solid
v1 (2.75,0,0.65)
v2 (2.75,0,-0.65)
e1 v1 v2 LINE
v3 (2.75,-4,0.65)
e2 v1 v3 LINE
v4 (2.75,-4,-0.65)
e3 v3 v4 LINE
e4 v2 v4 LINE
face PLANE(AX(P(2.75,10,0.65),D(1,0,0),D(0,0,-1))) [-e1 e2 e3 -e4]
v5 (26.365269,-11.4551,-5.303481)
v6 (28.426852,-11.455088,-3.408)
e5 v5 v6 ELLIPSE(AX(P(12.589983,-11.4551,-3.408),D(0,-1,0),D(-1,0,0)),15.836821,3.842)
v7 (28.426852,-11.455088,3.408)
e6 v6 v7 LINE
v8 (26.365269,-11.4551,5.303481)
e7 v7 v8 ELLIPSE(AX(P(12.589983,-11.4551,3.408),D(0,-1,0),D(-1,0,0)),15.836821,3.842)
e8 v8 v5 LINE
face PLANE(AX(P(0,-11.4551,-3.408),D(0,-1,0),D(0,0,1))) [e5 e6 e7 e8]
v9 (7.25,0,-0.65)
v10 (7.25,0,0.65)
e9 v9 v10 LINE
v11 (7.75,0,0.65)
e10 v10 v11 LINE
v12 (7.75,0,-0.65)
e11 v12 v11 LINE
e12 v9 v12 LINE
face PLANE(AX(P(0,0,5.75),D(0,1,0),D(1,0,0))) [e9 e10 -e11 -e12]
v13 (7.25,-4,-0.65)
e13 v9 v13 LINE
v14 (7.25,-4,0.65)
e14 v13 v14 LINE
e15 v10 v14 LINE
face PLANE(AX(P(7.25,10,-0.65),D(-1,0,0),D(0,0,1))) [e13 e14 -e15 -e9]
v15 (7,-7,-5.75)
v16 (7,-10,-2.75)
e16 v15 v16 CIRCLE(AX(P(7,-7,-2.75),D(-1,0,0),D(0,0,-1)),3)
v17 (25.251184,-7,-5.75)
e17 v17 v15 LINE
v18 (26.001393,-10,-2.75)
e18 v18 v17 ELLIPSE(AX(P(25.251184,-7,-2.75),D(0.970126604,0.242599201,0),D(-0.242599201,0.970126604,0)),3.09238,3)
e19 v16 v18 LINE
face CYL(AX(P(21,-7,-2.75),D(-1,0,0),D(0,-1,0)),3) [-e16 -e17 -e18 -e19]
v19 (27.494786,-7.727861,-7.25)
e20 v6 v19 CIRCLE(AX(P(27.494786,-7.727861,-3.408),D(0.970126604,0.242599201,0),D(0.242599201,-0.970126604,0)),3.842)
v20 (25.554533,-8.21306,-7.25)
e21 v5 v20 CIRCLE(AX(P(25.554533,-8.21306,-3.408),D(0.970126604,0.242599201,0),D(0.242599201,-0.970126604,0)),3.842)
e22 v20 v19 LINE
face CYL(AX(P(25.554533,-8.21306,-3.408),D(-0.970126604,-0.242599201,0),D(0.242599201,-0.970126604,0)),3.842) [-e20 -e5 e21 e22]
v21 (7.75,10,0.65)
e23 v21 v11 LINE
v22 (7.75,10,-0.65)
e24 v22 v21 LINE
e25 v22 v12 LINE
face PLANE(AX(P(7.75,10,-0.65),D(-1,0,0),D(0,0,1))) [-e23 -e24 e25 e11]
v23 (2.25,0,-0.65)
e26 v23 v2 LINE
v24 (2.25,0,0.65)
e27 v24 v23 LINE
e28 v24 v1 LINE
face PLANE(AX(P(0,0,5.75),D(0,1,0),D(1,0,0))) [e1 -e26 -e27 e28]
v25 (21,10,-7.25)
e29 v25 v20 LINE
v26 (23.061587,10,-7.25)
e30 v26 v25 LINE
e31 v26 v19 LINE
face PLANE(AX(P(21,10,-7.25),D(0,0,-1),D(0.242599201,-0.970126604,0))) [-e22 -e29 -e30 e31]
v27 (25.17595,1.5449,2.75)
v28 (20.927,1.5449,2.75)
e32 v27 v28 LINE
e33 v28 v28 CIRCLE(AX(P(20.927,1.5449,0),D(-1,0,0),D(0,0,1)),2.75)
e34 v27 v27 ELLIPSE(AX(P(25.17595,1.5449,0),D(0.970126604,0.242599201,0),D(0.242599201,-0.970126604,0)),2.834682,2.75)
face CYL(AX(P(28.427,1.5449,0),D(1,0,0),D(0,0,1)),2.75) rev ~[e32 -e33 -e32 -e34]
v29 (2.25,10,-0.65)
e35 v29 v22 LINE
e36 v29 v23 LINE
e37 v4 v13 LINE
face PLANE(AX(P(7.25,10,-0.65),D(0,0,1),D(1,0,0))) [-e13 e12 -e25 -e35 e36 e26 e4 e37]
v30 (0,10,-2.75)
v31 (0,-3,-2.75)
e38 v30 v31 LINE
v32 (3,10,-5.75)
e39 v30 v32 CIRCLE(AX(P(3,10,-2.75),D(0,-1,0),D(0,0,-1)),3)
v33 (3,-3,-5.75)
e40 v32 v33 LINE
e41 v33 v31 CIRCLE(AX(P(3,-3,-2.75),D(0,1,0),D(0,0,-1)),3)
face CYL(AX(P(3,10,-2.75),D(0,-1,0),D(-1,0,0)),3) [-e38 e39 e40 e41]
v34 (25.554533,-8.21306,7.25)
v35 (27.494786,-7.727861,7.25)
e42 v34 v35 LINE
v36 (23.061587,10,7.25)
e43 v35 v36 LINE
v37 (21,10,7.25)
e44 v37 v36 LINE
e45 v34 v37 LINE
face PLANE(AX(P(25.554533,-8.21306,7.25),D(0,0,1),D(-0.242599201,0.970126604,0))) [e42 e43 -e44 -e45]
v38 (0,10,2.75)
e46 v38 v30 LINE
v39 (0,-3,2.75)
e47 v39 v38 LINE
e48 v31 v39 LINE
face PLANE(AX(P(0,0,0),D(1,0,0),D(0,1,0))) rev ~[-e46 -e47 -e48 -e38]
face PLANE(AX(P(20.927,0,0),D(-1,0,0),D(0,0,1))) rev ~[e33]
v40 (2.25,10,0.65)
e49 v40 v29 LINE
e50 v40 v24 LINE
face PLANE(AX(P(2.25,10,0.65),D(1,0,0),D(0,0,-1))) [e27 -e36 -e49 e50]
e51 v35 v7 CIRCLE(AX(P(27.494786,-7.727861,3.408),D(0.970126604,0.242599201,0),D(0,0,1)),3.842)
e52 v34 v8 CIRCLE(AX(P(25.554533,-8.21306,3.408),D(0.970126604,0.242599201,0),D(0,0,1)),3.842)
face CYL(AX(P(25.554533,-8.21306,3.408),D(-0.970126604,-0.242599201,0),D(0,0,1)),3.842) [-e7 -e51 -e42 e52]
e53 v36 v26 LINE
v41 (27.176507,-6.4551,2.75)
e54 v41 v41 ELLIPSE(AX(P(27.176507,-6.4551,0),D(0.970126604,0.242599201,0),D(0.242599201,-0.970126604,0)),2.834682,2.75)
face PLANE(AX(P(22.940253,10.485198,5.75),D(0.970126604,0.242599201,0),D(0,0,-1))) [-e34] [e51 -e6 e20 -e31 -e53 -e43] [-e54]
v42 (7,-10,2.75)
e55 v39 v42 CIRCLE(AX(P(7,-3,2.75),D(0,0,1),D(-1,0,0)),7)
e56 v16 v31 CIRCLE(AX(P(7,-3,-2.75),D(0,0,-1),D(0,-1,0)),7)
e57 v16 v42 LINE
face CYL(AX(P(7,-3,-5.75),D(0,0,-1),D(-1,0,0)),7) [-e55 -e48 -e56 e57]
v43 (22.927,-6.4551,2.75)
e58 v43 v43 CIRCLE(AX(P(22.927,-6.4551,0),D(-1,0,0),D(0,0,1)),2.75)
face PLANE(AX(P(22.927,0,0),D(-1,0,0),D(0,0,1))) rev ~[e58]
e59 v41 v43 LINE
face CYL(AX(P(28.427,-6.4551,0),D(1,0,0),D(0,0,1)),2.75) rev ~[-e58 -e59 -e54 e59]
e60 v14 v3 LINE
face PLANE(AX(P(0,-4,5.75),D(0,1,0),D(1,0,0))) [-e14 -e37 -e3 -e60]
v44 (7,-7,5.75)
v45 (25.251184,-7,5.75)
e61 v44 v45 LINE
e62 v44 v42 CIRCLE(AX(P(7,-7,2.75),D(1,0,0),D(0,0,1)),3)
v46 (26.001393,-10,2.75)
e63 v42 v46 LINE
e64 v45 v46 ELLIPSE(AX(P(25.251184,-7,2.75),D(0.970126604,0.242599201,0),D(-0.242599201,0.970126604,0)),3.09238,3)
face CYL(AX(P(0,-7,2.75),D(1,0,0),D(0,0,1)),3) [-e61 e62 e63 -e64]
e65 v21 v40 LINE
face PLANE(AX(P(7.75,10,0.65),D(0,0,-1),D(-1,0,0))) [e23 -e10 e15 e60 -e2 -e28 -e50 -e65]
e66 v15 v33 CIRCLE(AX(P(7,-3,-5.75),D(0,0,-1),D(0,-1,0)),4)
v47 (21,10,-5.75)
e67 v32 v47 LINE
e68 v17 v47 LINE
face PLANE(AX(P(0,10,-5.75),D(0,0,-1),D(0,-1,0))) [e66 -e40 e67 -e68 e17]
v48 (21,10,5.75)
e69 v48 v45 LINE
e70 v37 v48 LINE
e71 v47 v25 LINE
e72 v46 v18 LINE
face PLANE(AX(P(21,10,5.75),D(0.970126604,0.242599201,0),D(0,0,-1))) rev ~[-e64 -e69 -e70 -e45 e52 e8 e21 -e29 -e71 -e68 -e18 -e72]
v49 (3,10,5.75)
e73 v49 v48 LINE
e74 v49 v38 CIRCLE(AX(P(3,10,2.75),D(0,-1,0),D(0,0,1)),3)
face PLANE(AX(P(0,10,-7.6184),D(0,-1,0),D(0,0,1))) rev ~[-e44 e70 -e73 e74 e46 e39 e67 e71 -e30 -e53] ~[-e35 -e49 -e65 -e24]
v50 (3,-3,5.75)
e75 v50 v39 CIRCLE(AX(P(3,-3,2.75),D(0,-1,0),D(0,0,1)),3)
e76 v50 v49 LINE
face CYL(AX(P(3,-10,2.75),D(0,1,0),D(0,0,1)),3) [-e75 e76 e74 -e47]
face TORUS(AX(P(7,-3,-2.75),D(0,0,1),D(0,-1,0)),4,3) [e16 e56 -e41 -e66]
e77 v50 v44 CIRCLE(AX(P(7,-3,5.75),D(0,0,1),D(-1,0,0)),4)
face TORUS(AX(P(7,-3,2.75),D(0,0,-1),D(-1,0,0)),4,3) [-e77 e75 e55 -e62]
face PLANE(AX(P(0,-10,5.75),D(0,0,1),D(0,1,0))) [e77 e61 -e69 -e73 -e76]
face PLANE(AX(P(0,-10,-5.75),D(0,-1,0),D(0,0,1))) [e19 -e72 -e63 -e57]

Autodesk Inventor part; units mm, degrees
ref_plane "YZ Plane" through (0, 0, 0) normal (1, 0, 0) x (0, 1, 0)
sketch "Sketch1" plane through (0, 0, 0) normal (1, 0, 0) x (0, 1, 0)
  line L0 (-10, 5.75) -> (10, 5.75)
  line L1 (10, 5.75) -> (10, -5.75)
  line L2 (10, -5.75) -> (-10, -5.75)
  line L3 (-10, -5.75) -> (-10, 5.75)
  line L4 (-10, 5.75) -> (10, -5.75) construction
  line L5 (10, 5.75) -> (-10, -5.75) construction
  point P0 (0, 0)
  dimension "d0" = 20
  dimension "d1" = 11.5
extrude "Extrusion1" add sketch "Sketch1" along normal blind 21
ref_plane "Work Plane1" through (21, 10, -5.75) normal (0.9701266, 0.2425992, 0) x (0, 0, 1)
sketch "Sketch2" plane through (0, 10, 5.75) normal (0, 1, 0) x (1, 0, 0)
  line L0 (7.75, 5.1) -> (2.25, 5.1)
  line L1 (2.25, 5.1) -> (2.25, 6.4)
  line L2 (2.25, 6.4) -> (7.75, 6.4)
  line L3 (7.75, 6.4) -> (7.75, 5.1)
  line L4 (7.75, 5.1) -> (2.25, 6.4) construction
  line L5 (2.25, 5.1) -> (7.75, 6.4) construction
  line L6 (7.25, 5.1) -> (2.75, 5.1)
  line L7 (2.75, 5.1) -> (2.75, 6.4)
  line L8 (2.75, 6.4) -> (7.25, 6.4)
  line L9 (7.25, 6.4) -> (7.25, 5.1)
  line L10 (7.25, 5.1) -> (2.75, 6.4) construction
  line L11 (2.75, 5.1) -> (7.25, 6.4) construction
  line L12 (0, 11.5) -> (0, 0) construction
  point P0 (0, 5.75)
  point P1 (5, 5.75)
  point P2 (5, 5.75)
  point P3 (7.25, 5.1)
  point P4 (2.75, 5.1)
  point P5 (0, 5.75)
  dimension "d4" = 5.5
  dimension "d5" = 1.3
  dimension "d6" = 4.5
  dimension "d20" = 5
extrude "Extrusion2" cut sketch "Sketch2" against normal blind 10
extrude "Extrusion3" cut sketch "Sketch2" against normal blind 14 contours L0 L7 L2 L9
fillet "Fillet1" radius 3 4 edges at (0, 0, 5.75) (10.5, -10, 5.75) (10.5, -10, -5.75) (0, 0, -5.75)
fillet "Fillet2" radius 7 3 edges at (0.8787, -9.1213, -4.8713) (0.8787, -9.1213, 4.8713) (0, -10, 0)
sketch "Sketch4" plane through (21, 0, 0) normal (1, 0, 0) x (0, 0, -1)
  arc A0 (2.75, -10) -> (5.75, -7) centre (2.75, -7) ccw projected
  line L0 (5.75, -7) -> (5.75, 10) projected
  line L1 (5.75, 10) -> (-5.75, 10) projected
  line L2 (-5.75, 10) -> (-5.75, -7) projected
  arc A1 (-5.75, -7) -> (-2.75, -10) centre (-2.75, -7) ccw projected
  line L3 (-2.75, -10) -> (2.75, -10) projected
  point P0 (0, 0)
extrude "Extrusion5" add sketch "Sketch4" along normal up to surface surface through (21, 10, -5.75) normal (0.9701266, 0.2425992, 0)
sketch "Sketch6" plane through (21, 10, 5.75) normal (0.9701266, 0.2425992, 0) x (0, 0, -1)
  line L0 (11.5, 0) -> (11.5, -17.5235) projected
  line L1 (11.5, 0) -> (0, 0) projected
  line L2 (0, -17.5235) -> (0, 0) projected
  line L3 (8.5, -20.6159) -> (3, -20.6159) projected
  line L4 (-1.5, 0) -> (13, 0)
  line L5 (13, 0) -> (13, -18.7739)
  line L6 (9.158, -22.6159) -> (2.342, -22.6159)
  line L7 (-1.5, -18.7739) -> (-1.5, 0)
  arc A0 (-1.5, -18.7739) -> (2.342, -22.6159) centre (2.342, -18.7739) ccw
  arc A1 (9.158, -22.6159) -> (13, -18.7739) centre (9.158, -18.7739) ccw
  point P0 (5.75, -4.6067)
  dimension "d21" = 1.5
  dimension "d22" = 1.5
  dimension "d23" = 2
  dimension "d24" = 3.842
extrude "Extrusion6" add sketch "Sketch6" along normal blind 2
sketch "Sketch7" plane through (0, 0, 0) normal (-1, 0, 0) x (0, 0, 1)
  line L0 (7.25, 10.4852) -> (7.25, -7.7278) construction
  line L1 (-7.6184, 10) -> (7.25, 10)
  line L2 (7.25, 10) -> (7.25, 10.4852)
  line L3 (7.25, 10.4852) -> (-7.6184, 10.4852)
  line L4 (-7.6184, 10.4852) -> (-7.6184, 10)
  line L5 (3.408, -11.4551) -> (-3.408, -11.4551) construction
  line L6 (-3.408, -11.4551) -> (7.25, -11.4551)
  line L7 (7.25, -11.4551) -> (7.25, -13.162)
  line L8 (7.25, -13.162) -> (-3.408, -13.162)
  line L9 (-3.408, -13.162) -> (-3.408, -11.4551)
  line L10 (-3.408, -11.4551) -> (-7.4388, -11.4551)
  line L11 (-7.4388, -11.4551) -> (-7.4388, -13.1256)
  line L12 (-7.4388, -13.1256) -> (-3.408, -13.1256)
  line L13 (-3.408, -13.1256) -> (-3.408, -11.4551)
  point P0 (0, 0)
  point P1 (-2.75, 10)
extrude "Extrusion7" cut sketch "Sketch7" against normal through all
ref_plane "Work Plane2" through (28.427, 0, 0) normal (-1, 0, 0) x (0, 0, 1)
sketch "Sketch8" plane through (28.427, 0, 0) normal (-1, 0, 0) x (0, 0, 1)
  circle A0 centre (0, 1.5449) radius 2.75
  circle A1 centre (0, -6.4551) radius 2.75
  line L0 (3.408, -11.4551) -> (-3.408, -11.4551) construction
  point P0 (0, 0)
  dimension "d30" = 5.5
  dimension "d31" = 5.5
  dimension "d36" = 8
  dimension "d37" = 5
extrude "Extrusion8" cut sketch "Sketch8" along normal blind 5.5 contours A1
extrude "Extrusion9" cut sketch "Sketch8" along normal blind 7.5 contours A0
properties part number "buton" material "PBT Plastic"
